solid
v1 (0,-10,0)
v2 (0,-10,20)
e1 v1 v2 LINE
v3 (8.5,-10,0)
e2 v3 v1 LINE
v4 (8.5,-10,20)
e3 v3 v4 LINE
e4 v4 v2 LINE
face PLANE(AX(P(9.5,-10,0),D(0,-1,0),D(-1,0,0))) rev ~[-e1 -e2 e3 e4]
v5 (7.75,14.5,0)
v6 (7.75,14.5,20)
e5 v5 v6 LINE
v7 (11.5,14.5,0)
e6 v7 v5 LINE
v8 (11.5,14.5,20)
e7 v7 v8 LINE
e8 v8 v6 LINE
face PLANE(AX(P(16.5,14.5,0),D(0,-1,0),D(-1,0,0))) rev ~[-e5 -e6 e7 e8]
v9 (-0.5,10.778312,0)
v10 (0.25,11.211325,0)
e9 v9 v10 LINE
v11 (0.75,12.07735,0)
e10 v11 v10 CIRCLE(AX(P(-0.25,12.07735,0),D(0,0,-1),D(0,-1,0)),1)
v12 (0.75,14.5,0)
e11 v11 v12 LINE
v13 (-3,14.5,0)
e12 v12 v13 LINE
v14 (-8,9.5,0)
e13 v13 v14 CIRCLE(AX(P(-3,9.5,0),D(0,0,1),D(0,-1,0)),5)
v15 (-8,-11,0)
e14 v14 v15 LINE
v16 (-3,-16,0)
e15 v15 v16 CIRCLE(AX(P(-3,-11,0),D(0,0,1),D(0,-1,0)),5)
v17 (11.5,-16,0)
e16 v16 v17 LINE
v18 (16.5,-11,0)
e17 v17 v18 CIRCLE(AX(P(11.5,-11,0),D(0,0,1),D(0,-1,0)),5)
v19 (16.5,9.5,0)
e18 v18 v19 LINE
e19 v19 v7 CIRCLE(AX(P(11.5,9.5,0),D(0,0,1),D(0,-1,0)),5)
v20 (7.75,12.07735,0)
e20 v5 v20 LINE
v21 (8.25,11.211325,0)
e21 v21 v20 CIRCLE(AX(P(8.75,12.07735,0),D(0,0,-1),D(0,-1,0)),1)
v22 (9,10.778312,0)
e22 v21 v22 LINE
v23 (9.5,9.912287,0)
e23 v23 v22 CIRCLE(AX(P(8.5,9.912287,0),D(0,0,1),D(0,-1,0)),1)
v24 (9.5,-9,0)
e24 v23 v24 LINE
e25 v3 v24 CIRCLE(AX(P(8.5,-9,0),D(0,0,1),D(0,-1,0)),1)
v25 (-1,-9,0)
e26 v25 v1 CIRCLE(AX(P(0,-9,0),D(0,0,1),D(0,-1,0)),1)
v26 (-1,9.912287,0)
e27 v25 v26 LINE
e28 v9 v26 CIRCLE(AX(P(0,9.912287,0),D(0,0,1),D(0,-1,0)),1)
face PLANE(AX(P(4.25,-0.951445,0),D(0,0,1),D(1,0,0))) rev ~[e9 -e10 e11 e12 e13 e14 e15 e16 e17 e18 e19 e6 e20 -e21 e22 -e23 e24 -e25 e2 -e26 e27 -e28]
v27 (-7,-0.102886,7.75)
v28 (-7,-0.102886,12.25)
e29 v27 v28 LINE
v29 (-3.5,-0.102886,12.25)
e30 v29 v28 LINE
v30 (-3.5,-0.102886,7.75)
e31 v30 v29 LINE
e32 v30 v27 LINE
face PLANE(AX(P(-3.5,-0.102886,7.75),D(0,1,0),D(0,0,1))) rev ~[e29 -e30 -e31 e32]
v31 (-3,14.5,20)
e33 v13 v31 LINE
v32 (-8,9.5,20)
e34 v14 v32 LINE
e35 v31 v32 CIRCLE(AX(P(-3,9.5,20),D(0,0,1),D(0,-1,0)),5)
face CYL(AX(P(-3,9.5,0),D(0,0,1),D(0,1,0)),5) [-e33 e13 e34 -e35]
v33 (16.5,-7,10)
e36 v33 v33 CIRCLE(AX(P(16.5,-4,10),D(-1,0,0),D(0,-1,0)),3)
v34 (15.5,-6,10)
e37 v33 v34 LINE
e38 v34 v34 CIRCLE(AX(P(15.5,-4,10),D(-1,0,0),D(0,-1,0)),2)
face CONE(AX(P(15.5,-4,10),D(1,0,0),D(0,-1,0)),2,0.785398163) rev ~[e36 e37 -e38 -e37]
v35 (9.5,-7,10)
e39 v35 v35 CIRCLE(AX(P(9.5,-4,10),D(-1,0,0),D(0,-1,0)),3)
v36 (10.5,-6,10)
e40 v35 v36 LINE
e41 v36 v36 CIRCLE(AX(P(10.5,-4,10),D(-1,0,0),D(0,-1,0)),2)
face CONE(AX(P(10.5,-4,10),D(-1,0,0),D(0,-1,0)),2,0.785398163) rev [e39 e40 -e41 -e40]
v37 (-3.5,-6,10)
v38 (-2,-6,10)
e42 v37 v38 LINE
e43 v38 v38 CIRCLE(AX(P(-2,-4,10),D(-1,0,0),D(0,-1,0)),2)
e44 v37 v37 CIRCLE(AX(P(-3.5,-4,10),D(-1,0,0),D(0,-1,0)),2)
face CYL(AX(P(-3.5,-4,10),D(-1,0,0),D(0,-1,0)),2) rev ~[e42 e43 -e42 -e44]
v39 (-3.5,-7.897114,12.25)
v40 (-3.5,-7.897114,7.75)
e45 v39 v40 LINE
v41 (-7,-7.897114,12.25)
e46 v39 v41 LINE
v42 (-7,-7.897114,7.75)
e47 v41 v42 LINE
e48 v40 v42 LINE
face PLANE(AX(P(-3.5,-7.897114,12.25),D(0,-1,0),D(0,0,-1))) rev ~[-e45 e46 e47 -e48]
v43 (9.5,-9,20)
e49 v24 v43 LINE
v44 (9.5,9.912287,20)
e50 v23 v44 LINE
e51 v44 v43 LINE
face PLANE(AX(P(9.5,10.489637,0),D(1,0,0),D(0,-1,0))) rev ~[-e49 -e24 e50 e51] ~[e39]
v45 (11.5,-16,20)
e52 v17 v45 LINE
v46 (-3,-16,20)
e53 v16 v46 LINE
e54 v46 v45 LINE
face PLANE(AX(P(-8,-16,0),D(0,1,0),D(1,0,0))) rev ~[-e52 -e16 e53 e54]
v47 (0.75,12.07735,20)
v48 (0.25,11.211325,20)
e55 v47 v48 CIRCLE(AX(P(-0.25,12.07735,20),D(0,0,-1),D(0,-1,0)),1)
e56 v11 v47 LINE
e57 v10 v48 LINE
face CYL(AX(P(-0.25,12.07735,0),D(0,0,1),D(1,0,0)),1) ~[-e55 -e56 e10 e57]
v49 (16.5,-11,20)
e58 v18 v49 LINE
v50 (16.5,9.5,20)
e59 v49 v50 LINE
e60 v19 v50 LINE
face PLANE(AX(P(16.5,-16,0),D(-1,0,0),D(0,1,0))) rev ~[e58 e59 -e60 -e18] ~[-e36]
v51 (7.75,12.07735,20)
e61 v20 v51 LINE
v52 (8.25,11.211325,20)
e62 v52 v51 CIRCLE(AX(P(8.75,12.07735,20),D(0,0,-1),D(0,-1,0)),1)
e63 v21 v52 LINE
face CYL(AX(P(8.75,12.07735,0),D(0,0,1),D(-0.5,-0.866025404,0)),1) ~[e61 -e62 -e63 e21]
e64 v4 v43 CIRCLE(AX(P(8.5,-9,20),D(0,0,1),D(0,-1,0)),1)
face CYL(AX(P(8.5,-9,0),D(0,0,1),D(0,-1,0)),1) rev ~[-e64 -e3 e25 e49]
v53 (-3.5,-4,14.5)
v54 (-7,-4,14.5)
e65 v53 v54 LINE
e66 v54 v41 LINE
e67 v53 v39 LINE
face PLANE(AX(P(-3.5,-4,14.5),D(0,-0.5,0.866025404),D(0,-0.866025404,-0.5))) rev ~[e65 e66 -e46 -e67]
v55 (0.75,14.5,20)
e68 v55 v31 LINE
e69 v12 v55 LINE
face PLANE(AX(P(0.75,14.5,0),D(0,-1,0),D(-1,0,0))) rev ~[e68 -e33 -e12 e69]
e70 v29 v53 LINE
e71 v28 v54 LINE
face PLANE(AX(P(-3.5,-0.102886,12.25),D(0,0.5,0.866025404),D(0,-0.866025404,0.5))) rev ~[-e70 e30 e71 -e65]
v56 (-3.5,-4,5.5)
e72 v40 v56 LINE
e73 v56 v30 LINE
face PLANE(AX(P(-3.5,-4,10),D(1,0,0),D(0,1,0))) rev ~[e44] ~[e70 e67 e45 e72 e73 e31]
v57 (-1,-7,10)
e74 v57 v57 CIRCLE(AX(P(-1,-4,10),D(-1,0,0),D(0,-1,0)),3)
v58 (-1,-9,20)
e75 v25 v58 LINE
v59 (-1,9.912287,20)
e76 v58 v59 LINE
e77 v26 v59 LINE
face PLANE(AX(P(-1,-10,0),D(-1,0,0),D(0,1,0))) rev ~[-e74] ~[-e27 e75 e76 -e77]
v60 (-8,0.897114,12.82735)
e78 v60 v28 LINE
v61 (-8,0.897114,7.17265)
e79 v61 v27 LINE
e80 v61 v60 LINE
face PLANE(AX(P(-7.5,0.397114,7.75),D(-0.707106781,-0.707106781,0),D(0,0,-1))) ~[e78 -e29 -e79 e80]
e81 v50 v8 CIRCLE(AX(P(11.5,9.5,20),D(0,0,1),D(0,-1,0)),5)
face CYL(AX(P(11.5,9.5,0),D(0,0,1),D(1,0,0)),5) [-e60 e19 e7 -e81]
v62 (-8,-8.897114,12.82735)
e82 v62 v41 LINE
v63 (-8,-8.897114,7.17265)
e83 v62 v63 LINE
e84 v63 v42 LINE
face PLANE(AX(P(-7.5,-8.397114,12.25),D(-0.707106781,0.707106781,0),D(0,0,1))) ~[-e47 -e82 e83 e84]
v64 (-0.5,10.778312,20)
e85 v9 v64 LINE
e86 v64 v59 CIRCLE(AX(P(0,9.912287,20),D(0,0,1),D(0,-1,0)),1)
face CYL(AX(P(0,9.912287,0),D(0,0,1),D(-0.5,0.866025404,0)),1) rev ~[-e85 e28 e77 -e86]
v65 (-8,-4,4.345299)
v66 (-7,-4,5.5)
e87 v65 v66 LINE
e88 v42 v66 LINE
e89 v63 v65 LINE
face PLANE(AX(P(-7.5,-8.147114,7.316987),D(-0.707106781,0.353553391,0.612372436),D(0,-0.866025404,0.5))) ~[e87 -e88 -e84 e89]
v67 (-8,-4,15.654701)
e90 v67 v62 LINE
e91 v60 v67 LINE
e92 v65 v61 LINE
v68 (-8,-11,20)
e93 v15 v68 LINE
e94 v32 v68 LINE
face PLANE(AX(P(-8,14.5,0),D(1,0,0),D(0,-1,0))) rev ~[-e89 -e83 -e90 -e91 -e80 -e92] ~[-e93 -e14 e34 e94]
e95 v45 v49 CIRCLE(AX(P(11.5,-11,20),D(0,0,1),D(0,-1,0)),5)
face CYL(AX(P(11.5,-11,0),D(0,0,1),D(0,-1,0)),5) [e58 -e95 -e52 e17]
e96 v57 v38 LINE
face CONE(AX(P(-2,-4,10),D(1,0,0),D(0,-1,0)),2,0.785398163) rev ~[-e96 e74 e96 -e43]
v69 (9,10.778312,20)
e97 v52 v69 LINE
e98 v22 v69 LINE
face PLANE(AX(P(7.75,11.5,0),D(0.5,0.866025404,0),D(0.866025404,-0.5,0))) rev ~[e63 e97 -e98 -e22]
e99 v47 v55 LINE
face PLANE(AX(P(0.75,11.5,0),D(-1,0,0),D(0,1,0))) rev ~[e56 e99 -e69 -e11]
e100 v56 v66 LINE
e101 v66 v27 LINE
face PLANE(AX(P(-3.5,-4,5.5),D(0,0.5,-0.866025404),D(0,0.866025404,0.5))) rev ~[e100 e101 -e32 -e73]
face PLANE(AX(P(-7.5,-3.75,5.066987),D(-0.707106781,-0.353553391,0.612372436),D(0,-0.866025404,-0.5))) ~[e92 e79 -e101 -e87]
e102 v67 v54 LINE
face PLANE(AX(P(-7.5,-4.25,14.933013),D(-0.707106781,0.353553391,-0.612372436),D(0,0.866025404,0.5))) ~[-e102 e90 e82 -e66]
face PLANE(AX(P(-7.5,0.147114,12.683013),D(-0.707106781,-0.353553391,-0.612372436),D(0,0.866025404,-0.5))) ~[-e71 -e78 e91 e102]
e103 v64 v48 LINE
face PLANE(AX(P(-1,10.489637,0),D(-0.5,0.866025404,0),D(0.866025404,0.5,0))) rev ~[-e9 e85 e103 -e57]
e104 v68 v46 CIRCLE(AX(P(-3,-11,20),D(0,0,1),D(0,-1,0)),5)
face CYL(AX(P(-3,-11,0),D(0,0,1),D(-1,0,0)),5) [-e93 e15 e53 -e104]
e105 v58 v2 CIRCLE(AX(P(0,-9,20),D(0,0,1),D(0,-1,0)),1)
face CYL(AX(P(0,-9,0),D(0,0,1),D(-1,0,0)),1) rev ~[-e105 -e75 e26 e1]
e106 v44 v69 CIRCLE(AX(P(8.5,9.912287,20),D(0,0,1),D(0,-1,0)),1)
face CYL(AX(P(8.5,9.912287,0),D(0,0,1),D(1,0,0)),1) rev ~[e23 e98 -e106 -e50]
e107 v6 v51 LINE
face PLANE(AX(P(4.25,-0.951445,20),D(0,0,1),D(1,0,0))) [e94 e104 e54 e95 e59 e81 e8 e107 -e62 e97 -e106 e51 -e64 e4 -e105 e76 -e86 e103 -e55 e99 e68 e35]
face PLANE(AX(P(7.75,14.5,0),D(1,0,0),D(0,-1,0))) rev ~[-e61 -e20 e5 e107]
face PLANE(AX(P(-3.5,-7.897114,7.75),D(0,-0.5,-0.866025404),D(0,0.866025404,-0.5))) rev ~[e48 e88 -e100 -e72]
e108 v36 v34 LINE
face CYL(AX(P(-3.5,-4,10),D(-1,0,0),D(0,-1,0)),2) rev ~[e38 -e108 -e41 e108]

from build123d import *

# Parameters (mm, degrees)
F2_DEPTH = 20
F3_R     = 5
F4_R     = 1
F6_START = -2.5
F6_DEPTH = 7.5
F7_R     = 2
F8_DEPTH = 25
F9_SIZE  = 1
F10_SIZE = 1


# Not quite as in the source:
# - a feature names something its author has since deleted; it is built from what else it names


with BuildPart() as f2:
    # F1 (on Top) → F2 (new body)
    with BuildSketch(Plane.XY):
        Polygon((0.75, 14.5), (-8, 14.5), (-8, -16), (16.5, -16), (16.5, 14.5), (7.75, 14.5), (7.75, 11.5), (9.5, 10.4896370289), (9.5, -10), (-1, -10), (-1, 10.4896370289), (0.75, 11.5), align=None)
    extrude(amount=F2_DEPTH)

    # F3
    f3_edges = [f2.edges().sort_by_distance(p)[0] for p in [
        (-8, 14.5, 10),
        (16.5, 14.5, 10),
        (-8, -16, 10),
        (16.5, -16, 10),
    ]]
    fillet(f3_edges, radius=F3_R)

    # F4
    f4_edges = [f2.edges().sort_by_distance(p)[0] for p in [
        (0.75, 11.5, 10),
        (7.75, 11.5, 10),
        (-1, 10.489637, 10),
        (9.5, 10.489637, 10),
        (9.5, -10, 10),
        (-1, -10, 10),
    ]]
    fillet(f4_edges, radius=F4_R)

    # F5 (on face) → F6 (cut)
    with BuildSketch(Plane.YZ.offset(-1).offset(F6_START)):
        Polygon((-7.897114317, 7.75), (-4, 5.5), (-0.102885683, 7.75), (-0.102885683, 12.25), (-4, 14.5), (-7.897114317, 12.25), align=None)
    extrude(amount=-F6_DEPTH, mode=Mode.SUBTRACT)

    # F7 (on face) → F8 (cut)
    with BuildSketch(Plane(origin=(-3.5, 0, 0), x_dir=(0, -1, 0), z_dir=(-1, 0, 0))):
        with Locations((4, 10)):
            Circle(F7_R)
    extrude(amount=-F8_DEPTH, mode=Mode.SUBTRACT)

    # F9
    f9_edges = [f2.edges().sort_by_distance(p)[0] for p in [
        (-8, -7.897114, 10),
        (-8, -5.948557, 13.375),
        (-8, -2.051443, 13.375),
        (-8, -0.102886, 10),
        (-8, -5.948557, 6.625),
        (-8, -2.051443, 6.625),
    ]]
    chamfer(f9_edges, length=F9_SIZE)

    # F10
    f10_edges = [f2.edges().sort_by_distance(p)[0] for p in [
        (16.5, -2, 10),
        (-1, -2, 10),
        (9.5, -2, 10),
    ]]
    chamfer(f10_edges, length=F10_SIZE)


solid = f2.part
